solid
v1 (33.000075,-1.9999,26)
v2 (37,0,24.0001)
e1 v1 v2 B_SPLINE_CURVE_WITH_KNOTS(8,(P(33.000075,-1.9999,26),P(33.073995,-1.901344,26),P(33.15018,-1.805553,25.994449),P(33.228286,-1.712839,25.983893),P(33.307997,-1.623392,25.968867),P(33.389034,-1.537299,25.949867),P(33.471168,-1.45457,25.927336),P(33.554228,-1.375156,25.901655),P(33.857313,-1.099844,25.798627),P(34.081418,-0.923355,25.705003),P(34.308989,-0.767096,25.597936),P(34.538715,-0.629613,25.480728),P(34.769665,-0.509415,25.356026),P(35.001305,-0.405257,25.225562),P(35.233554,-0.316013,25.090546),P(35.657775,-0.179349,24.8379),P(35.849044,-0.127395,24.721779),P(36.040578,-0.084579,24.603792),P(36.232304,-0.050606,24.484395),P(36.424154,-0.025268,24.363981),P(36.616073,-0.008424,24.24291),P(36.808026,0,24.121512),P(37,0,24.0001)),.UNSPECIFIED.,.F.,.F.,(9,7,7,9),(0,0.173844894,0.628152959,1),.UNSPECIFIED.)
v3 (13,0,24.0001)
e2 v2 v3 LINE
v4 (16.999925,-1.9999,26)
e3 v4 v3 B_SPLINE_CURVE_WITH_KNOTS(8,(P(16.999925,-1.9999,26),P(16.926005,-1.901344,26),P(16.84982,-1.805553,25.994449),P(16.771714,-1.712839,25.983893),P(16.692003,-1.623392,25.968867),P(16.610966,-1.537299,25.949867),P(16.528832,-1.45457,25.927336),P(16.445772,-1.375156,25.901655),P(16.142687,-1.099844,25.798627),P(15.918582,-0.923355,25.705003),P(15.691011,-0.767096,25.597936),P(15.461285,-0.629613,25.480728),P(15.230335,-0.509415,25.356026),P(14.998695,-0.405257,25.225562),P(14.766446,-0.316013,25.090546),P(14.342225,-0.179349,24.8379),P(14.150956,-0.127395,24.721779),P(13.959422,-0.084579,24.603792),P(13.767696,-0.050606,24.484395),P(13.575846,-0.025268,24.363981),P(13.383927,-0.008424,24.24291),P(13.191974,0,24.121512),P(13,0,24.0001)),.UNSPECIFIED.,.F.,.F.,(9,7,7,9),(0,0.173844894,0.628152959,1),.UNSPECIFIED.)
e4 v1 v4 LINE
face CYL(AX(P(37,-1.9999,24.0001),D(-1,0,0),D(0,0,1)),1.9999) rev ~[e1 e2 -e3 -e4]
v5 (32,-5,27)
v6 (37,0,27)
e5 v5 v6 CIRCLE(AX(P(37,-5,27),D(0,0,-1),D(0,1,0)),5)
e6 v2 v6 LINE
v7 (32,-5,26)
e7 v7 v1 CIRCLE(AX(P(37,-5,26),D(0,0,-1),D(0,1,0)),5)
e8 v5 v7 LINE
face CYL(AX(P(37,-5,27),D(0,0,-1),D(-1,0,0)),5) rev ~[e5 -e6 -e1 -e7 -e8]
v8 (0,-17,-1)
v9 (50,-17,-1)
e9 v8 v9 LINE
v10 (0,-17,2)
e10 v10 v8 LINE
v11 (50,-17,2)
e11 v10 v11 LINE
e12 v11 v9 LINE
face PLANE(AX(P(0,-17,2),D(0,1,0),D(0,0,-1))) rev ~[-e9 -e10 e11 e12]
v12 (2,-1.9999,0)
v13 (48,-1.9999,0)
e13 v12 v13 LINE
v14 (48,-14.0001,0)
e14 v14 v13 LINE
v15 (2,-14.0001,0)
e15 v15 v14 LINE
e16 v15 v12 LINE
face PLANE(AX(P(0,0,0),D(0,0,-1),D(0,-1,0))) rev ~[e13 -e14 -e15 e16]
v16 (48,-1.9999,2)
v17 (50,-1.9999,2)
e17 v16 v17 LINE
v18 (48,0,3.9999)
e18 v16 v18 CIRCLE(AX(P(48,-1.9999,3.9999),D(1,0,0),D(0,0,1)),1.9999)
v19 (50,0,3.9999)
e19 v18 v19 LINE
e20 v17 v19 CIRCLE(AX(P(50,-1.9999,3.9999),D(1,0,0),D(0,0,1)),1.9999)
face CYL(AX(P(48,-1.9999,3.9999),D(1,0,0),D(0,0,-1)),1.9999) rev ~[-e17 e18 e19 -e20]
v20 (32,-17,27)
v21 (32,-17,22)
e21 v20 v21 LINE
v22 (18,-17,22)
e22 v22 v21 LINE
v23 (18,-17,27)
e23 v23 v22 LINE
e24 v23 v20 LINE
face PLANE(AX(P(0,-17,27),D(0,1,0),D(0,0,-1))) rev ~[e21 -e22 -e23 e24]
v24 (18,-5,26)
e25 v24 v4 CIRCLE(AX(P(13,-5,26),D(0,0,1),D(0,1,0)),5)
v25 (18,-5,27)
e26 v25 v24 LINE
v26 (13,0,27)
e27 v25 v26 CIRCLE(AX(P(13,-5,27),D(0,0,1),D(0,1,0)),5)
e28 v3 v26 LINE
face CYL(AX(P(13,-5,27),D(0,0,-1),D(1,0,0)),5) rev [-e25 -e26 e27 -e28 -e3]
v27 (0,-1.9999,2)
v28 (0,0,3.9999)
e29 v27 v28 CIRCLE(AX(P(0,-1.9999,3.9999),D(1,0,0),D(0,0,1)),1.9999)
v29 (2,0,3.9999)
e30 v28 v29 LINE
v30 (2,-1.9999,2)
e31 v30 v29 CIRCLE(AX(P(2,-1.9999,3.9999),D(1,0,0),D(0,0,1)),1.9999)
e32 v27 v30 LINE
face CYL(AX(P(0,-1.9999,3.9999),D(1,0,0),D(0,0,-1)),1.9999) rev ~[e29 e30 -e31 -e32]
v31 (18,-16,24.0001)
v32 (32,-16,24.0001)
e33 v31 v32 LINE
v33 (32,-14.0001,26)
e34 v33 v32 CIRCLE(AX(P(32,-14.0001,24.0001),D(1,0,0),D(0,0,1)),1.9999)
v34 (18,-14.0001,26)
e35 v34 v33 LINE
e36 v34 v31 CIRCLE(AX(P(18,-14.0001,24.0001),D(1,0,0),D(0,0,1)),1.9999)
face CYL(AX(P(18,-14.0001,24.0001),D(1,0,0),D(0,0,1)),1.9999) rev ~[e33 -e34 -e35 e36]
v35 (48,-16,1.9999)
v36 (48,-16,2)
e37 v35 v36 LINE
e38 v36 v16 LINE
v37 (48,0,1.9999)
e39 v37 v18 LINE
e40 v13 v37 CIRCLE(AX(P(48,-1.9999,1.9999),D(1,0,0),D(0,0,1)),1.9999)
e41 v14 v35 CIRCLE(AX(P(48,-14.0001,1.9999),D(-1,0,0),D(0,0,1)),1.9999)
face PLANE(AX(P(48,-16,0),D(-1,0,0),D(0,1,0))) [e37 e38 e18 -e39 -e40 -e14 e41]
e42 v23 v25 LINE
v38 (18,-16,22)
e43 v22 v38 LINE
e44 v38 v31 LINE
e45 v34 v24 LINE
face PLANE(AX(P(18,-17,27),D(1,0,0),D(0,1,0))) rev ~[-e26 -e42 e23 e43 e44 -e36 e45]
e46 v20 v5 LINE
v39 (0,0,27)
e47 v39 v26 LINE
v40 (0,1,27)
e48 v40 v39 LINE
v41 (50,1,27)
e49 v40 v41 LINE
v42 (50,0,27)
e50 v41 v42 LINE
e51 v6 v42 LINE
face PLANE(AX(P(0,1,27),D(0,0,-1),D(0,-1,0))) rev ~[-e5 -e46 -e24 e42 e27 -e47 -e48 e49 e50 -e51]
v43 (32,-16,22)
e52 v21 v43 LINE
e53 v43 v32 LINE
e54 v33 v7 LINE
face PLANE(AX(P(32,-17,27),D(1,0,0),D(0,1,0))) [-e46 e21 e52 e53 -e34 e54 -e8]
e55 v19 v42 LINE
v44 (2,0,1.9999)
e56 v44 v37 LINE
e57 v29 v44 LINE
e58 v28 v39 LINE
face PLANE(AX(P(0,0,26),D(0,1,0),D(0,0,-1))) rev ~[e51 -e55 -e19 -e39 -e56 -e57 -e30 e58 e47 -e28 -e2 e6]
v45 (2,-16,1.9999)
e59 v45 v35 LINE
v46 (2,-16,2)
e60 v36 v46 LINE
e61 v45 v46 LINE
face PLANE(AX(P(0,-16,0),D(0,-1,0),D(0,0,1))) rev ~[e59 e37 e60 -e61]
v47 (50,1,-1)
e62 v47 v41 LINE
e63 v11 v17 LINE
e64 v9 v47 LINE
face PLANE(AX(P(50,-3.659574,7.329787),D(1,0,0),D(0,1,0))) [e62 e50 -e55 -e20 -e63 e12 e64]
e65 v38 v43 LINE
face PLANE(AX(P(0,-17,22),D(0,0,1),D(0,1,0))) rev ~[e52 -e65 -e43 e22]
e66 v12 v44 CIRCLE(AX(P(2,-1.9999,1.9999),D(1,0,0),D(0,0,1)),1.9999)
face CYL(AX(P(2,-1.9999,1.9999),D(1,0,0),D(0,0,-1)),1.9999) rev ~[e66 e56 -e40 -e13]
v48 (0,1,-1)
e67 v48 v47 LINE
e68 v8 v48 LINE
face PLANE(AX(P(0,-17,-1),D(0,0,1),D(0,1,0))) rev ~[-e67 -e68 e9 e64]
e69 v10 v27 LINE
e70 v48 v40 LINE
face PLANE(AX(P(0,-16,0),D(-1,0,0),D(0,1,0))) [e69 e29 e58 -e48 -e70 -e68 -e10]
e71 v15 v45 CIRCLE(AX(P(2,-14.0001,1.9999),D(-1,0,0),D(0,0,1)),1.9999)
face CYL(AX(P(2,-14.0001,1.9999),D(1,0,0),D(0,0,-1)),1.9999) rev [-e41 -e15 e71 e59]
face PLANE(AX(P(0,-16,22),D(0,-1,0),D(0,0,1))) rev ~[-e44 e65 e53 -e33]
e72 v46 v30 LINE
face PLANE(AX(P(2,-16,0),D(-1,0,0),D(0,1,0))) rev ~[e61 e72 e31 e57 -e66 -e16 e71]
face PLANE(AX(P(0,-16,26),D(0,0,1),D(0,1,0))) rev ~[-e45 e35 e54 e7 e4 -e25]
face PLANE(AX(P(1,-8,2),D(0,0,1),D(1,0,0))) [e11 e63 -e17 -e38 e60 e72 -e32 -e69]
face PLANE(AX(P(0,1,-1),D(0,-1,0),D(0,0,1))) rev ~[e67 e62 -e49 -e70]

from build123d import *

# Parameters (mm, degrees)
F1_DEPTH = 50
F2_W     = 2
F2_H     = 16
F3_DEPTH = 2
F4_W     = 18
F4_H     = 17
F5_DEPTH = 25
F7_R     = 5
F8_R     = 1.9999


# Not quite as in the source:
# - a fillet or chamfer is up to 0.001 mm smaller than in the source, because OpenCascade refuses the exact size
# - a feature of the source that left no trace in its solid (it failed there, or was rolled back) is left out


with BuildPart() as f1:
    # F0 (on Right) → F1 (new body)
    with BuildSketch(Plane.YZ):
        Polygon((0, 26), (0, 0), (-16, 0), (-16, 2), (-17, 2), (-17, -1), (1, -1), (1, 26), align=None)
        Polygon((-16, 26), (0, 26), (1, 26), (1, 27), (-17, 27), (-17, 22), (-16, 22), align=None)
    extrude(amount=F1_DEPTH)

    # F2 (on face) → F3 (join)
    with BuildSketch(Plane.XY):
        with Locations((1, -8)):
            Rectangle(F2_W, F2_H)
        with Locations((49, -8)):
            Rectangle(F2_W, F2_H)
    extrude(amount=F3_DEPTH)

    # F4 (on face) → F5 (cut)
    with BuildSketch(Plane.XY.offset(27)):
        with Locations((9, -8.5)):
            Rectangle(F4_W, F4_H)
        with Locations((41, -8.5)):
            Rectangle(F4_W, F4_H)
    extrude(amount=-F5_DEPTH, mode=Mode.SUBTRACT)

    # F7
    f7_edges = [f1.edges().sort_by_distance(p)[0] for p in [
        (32, 0, 26.5),
        (18, 0, 26.5),
    ]]
    fillet(f7_edges, radius=F7_R)

    # F8 (radius 2 in the source; OpenCascade refuses exactly that, so slightly less here)
    f8_edges = [f1.edges().sort_by_distance(p)[0] for p in [
        (25, -16, 0),
        (1, 0, 2),
        (25, 0, 26),
        (25, 0, 0),
        (49, 0, 2),
        (25, -16, 26),
    ]]
    fillet(f8_edges, radius=F8_R)


solid = f1.part
